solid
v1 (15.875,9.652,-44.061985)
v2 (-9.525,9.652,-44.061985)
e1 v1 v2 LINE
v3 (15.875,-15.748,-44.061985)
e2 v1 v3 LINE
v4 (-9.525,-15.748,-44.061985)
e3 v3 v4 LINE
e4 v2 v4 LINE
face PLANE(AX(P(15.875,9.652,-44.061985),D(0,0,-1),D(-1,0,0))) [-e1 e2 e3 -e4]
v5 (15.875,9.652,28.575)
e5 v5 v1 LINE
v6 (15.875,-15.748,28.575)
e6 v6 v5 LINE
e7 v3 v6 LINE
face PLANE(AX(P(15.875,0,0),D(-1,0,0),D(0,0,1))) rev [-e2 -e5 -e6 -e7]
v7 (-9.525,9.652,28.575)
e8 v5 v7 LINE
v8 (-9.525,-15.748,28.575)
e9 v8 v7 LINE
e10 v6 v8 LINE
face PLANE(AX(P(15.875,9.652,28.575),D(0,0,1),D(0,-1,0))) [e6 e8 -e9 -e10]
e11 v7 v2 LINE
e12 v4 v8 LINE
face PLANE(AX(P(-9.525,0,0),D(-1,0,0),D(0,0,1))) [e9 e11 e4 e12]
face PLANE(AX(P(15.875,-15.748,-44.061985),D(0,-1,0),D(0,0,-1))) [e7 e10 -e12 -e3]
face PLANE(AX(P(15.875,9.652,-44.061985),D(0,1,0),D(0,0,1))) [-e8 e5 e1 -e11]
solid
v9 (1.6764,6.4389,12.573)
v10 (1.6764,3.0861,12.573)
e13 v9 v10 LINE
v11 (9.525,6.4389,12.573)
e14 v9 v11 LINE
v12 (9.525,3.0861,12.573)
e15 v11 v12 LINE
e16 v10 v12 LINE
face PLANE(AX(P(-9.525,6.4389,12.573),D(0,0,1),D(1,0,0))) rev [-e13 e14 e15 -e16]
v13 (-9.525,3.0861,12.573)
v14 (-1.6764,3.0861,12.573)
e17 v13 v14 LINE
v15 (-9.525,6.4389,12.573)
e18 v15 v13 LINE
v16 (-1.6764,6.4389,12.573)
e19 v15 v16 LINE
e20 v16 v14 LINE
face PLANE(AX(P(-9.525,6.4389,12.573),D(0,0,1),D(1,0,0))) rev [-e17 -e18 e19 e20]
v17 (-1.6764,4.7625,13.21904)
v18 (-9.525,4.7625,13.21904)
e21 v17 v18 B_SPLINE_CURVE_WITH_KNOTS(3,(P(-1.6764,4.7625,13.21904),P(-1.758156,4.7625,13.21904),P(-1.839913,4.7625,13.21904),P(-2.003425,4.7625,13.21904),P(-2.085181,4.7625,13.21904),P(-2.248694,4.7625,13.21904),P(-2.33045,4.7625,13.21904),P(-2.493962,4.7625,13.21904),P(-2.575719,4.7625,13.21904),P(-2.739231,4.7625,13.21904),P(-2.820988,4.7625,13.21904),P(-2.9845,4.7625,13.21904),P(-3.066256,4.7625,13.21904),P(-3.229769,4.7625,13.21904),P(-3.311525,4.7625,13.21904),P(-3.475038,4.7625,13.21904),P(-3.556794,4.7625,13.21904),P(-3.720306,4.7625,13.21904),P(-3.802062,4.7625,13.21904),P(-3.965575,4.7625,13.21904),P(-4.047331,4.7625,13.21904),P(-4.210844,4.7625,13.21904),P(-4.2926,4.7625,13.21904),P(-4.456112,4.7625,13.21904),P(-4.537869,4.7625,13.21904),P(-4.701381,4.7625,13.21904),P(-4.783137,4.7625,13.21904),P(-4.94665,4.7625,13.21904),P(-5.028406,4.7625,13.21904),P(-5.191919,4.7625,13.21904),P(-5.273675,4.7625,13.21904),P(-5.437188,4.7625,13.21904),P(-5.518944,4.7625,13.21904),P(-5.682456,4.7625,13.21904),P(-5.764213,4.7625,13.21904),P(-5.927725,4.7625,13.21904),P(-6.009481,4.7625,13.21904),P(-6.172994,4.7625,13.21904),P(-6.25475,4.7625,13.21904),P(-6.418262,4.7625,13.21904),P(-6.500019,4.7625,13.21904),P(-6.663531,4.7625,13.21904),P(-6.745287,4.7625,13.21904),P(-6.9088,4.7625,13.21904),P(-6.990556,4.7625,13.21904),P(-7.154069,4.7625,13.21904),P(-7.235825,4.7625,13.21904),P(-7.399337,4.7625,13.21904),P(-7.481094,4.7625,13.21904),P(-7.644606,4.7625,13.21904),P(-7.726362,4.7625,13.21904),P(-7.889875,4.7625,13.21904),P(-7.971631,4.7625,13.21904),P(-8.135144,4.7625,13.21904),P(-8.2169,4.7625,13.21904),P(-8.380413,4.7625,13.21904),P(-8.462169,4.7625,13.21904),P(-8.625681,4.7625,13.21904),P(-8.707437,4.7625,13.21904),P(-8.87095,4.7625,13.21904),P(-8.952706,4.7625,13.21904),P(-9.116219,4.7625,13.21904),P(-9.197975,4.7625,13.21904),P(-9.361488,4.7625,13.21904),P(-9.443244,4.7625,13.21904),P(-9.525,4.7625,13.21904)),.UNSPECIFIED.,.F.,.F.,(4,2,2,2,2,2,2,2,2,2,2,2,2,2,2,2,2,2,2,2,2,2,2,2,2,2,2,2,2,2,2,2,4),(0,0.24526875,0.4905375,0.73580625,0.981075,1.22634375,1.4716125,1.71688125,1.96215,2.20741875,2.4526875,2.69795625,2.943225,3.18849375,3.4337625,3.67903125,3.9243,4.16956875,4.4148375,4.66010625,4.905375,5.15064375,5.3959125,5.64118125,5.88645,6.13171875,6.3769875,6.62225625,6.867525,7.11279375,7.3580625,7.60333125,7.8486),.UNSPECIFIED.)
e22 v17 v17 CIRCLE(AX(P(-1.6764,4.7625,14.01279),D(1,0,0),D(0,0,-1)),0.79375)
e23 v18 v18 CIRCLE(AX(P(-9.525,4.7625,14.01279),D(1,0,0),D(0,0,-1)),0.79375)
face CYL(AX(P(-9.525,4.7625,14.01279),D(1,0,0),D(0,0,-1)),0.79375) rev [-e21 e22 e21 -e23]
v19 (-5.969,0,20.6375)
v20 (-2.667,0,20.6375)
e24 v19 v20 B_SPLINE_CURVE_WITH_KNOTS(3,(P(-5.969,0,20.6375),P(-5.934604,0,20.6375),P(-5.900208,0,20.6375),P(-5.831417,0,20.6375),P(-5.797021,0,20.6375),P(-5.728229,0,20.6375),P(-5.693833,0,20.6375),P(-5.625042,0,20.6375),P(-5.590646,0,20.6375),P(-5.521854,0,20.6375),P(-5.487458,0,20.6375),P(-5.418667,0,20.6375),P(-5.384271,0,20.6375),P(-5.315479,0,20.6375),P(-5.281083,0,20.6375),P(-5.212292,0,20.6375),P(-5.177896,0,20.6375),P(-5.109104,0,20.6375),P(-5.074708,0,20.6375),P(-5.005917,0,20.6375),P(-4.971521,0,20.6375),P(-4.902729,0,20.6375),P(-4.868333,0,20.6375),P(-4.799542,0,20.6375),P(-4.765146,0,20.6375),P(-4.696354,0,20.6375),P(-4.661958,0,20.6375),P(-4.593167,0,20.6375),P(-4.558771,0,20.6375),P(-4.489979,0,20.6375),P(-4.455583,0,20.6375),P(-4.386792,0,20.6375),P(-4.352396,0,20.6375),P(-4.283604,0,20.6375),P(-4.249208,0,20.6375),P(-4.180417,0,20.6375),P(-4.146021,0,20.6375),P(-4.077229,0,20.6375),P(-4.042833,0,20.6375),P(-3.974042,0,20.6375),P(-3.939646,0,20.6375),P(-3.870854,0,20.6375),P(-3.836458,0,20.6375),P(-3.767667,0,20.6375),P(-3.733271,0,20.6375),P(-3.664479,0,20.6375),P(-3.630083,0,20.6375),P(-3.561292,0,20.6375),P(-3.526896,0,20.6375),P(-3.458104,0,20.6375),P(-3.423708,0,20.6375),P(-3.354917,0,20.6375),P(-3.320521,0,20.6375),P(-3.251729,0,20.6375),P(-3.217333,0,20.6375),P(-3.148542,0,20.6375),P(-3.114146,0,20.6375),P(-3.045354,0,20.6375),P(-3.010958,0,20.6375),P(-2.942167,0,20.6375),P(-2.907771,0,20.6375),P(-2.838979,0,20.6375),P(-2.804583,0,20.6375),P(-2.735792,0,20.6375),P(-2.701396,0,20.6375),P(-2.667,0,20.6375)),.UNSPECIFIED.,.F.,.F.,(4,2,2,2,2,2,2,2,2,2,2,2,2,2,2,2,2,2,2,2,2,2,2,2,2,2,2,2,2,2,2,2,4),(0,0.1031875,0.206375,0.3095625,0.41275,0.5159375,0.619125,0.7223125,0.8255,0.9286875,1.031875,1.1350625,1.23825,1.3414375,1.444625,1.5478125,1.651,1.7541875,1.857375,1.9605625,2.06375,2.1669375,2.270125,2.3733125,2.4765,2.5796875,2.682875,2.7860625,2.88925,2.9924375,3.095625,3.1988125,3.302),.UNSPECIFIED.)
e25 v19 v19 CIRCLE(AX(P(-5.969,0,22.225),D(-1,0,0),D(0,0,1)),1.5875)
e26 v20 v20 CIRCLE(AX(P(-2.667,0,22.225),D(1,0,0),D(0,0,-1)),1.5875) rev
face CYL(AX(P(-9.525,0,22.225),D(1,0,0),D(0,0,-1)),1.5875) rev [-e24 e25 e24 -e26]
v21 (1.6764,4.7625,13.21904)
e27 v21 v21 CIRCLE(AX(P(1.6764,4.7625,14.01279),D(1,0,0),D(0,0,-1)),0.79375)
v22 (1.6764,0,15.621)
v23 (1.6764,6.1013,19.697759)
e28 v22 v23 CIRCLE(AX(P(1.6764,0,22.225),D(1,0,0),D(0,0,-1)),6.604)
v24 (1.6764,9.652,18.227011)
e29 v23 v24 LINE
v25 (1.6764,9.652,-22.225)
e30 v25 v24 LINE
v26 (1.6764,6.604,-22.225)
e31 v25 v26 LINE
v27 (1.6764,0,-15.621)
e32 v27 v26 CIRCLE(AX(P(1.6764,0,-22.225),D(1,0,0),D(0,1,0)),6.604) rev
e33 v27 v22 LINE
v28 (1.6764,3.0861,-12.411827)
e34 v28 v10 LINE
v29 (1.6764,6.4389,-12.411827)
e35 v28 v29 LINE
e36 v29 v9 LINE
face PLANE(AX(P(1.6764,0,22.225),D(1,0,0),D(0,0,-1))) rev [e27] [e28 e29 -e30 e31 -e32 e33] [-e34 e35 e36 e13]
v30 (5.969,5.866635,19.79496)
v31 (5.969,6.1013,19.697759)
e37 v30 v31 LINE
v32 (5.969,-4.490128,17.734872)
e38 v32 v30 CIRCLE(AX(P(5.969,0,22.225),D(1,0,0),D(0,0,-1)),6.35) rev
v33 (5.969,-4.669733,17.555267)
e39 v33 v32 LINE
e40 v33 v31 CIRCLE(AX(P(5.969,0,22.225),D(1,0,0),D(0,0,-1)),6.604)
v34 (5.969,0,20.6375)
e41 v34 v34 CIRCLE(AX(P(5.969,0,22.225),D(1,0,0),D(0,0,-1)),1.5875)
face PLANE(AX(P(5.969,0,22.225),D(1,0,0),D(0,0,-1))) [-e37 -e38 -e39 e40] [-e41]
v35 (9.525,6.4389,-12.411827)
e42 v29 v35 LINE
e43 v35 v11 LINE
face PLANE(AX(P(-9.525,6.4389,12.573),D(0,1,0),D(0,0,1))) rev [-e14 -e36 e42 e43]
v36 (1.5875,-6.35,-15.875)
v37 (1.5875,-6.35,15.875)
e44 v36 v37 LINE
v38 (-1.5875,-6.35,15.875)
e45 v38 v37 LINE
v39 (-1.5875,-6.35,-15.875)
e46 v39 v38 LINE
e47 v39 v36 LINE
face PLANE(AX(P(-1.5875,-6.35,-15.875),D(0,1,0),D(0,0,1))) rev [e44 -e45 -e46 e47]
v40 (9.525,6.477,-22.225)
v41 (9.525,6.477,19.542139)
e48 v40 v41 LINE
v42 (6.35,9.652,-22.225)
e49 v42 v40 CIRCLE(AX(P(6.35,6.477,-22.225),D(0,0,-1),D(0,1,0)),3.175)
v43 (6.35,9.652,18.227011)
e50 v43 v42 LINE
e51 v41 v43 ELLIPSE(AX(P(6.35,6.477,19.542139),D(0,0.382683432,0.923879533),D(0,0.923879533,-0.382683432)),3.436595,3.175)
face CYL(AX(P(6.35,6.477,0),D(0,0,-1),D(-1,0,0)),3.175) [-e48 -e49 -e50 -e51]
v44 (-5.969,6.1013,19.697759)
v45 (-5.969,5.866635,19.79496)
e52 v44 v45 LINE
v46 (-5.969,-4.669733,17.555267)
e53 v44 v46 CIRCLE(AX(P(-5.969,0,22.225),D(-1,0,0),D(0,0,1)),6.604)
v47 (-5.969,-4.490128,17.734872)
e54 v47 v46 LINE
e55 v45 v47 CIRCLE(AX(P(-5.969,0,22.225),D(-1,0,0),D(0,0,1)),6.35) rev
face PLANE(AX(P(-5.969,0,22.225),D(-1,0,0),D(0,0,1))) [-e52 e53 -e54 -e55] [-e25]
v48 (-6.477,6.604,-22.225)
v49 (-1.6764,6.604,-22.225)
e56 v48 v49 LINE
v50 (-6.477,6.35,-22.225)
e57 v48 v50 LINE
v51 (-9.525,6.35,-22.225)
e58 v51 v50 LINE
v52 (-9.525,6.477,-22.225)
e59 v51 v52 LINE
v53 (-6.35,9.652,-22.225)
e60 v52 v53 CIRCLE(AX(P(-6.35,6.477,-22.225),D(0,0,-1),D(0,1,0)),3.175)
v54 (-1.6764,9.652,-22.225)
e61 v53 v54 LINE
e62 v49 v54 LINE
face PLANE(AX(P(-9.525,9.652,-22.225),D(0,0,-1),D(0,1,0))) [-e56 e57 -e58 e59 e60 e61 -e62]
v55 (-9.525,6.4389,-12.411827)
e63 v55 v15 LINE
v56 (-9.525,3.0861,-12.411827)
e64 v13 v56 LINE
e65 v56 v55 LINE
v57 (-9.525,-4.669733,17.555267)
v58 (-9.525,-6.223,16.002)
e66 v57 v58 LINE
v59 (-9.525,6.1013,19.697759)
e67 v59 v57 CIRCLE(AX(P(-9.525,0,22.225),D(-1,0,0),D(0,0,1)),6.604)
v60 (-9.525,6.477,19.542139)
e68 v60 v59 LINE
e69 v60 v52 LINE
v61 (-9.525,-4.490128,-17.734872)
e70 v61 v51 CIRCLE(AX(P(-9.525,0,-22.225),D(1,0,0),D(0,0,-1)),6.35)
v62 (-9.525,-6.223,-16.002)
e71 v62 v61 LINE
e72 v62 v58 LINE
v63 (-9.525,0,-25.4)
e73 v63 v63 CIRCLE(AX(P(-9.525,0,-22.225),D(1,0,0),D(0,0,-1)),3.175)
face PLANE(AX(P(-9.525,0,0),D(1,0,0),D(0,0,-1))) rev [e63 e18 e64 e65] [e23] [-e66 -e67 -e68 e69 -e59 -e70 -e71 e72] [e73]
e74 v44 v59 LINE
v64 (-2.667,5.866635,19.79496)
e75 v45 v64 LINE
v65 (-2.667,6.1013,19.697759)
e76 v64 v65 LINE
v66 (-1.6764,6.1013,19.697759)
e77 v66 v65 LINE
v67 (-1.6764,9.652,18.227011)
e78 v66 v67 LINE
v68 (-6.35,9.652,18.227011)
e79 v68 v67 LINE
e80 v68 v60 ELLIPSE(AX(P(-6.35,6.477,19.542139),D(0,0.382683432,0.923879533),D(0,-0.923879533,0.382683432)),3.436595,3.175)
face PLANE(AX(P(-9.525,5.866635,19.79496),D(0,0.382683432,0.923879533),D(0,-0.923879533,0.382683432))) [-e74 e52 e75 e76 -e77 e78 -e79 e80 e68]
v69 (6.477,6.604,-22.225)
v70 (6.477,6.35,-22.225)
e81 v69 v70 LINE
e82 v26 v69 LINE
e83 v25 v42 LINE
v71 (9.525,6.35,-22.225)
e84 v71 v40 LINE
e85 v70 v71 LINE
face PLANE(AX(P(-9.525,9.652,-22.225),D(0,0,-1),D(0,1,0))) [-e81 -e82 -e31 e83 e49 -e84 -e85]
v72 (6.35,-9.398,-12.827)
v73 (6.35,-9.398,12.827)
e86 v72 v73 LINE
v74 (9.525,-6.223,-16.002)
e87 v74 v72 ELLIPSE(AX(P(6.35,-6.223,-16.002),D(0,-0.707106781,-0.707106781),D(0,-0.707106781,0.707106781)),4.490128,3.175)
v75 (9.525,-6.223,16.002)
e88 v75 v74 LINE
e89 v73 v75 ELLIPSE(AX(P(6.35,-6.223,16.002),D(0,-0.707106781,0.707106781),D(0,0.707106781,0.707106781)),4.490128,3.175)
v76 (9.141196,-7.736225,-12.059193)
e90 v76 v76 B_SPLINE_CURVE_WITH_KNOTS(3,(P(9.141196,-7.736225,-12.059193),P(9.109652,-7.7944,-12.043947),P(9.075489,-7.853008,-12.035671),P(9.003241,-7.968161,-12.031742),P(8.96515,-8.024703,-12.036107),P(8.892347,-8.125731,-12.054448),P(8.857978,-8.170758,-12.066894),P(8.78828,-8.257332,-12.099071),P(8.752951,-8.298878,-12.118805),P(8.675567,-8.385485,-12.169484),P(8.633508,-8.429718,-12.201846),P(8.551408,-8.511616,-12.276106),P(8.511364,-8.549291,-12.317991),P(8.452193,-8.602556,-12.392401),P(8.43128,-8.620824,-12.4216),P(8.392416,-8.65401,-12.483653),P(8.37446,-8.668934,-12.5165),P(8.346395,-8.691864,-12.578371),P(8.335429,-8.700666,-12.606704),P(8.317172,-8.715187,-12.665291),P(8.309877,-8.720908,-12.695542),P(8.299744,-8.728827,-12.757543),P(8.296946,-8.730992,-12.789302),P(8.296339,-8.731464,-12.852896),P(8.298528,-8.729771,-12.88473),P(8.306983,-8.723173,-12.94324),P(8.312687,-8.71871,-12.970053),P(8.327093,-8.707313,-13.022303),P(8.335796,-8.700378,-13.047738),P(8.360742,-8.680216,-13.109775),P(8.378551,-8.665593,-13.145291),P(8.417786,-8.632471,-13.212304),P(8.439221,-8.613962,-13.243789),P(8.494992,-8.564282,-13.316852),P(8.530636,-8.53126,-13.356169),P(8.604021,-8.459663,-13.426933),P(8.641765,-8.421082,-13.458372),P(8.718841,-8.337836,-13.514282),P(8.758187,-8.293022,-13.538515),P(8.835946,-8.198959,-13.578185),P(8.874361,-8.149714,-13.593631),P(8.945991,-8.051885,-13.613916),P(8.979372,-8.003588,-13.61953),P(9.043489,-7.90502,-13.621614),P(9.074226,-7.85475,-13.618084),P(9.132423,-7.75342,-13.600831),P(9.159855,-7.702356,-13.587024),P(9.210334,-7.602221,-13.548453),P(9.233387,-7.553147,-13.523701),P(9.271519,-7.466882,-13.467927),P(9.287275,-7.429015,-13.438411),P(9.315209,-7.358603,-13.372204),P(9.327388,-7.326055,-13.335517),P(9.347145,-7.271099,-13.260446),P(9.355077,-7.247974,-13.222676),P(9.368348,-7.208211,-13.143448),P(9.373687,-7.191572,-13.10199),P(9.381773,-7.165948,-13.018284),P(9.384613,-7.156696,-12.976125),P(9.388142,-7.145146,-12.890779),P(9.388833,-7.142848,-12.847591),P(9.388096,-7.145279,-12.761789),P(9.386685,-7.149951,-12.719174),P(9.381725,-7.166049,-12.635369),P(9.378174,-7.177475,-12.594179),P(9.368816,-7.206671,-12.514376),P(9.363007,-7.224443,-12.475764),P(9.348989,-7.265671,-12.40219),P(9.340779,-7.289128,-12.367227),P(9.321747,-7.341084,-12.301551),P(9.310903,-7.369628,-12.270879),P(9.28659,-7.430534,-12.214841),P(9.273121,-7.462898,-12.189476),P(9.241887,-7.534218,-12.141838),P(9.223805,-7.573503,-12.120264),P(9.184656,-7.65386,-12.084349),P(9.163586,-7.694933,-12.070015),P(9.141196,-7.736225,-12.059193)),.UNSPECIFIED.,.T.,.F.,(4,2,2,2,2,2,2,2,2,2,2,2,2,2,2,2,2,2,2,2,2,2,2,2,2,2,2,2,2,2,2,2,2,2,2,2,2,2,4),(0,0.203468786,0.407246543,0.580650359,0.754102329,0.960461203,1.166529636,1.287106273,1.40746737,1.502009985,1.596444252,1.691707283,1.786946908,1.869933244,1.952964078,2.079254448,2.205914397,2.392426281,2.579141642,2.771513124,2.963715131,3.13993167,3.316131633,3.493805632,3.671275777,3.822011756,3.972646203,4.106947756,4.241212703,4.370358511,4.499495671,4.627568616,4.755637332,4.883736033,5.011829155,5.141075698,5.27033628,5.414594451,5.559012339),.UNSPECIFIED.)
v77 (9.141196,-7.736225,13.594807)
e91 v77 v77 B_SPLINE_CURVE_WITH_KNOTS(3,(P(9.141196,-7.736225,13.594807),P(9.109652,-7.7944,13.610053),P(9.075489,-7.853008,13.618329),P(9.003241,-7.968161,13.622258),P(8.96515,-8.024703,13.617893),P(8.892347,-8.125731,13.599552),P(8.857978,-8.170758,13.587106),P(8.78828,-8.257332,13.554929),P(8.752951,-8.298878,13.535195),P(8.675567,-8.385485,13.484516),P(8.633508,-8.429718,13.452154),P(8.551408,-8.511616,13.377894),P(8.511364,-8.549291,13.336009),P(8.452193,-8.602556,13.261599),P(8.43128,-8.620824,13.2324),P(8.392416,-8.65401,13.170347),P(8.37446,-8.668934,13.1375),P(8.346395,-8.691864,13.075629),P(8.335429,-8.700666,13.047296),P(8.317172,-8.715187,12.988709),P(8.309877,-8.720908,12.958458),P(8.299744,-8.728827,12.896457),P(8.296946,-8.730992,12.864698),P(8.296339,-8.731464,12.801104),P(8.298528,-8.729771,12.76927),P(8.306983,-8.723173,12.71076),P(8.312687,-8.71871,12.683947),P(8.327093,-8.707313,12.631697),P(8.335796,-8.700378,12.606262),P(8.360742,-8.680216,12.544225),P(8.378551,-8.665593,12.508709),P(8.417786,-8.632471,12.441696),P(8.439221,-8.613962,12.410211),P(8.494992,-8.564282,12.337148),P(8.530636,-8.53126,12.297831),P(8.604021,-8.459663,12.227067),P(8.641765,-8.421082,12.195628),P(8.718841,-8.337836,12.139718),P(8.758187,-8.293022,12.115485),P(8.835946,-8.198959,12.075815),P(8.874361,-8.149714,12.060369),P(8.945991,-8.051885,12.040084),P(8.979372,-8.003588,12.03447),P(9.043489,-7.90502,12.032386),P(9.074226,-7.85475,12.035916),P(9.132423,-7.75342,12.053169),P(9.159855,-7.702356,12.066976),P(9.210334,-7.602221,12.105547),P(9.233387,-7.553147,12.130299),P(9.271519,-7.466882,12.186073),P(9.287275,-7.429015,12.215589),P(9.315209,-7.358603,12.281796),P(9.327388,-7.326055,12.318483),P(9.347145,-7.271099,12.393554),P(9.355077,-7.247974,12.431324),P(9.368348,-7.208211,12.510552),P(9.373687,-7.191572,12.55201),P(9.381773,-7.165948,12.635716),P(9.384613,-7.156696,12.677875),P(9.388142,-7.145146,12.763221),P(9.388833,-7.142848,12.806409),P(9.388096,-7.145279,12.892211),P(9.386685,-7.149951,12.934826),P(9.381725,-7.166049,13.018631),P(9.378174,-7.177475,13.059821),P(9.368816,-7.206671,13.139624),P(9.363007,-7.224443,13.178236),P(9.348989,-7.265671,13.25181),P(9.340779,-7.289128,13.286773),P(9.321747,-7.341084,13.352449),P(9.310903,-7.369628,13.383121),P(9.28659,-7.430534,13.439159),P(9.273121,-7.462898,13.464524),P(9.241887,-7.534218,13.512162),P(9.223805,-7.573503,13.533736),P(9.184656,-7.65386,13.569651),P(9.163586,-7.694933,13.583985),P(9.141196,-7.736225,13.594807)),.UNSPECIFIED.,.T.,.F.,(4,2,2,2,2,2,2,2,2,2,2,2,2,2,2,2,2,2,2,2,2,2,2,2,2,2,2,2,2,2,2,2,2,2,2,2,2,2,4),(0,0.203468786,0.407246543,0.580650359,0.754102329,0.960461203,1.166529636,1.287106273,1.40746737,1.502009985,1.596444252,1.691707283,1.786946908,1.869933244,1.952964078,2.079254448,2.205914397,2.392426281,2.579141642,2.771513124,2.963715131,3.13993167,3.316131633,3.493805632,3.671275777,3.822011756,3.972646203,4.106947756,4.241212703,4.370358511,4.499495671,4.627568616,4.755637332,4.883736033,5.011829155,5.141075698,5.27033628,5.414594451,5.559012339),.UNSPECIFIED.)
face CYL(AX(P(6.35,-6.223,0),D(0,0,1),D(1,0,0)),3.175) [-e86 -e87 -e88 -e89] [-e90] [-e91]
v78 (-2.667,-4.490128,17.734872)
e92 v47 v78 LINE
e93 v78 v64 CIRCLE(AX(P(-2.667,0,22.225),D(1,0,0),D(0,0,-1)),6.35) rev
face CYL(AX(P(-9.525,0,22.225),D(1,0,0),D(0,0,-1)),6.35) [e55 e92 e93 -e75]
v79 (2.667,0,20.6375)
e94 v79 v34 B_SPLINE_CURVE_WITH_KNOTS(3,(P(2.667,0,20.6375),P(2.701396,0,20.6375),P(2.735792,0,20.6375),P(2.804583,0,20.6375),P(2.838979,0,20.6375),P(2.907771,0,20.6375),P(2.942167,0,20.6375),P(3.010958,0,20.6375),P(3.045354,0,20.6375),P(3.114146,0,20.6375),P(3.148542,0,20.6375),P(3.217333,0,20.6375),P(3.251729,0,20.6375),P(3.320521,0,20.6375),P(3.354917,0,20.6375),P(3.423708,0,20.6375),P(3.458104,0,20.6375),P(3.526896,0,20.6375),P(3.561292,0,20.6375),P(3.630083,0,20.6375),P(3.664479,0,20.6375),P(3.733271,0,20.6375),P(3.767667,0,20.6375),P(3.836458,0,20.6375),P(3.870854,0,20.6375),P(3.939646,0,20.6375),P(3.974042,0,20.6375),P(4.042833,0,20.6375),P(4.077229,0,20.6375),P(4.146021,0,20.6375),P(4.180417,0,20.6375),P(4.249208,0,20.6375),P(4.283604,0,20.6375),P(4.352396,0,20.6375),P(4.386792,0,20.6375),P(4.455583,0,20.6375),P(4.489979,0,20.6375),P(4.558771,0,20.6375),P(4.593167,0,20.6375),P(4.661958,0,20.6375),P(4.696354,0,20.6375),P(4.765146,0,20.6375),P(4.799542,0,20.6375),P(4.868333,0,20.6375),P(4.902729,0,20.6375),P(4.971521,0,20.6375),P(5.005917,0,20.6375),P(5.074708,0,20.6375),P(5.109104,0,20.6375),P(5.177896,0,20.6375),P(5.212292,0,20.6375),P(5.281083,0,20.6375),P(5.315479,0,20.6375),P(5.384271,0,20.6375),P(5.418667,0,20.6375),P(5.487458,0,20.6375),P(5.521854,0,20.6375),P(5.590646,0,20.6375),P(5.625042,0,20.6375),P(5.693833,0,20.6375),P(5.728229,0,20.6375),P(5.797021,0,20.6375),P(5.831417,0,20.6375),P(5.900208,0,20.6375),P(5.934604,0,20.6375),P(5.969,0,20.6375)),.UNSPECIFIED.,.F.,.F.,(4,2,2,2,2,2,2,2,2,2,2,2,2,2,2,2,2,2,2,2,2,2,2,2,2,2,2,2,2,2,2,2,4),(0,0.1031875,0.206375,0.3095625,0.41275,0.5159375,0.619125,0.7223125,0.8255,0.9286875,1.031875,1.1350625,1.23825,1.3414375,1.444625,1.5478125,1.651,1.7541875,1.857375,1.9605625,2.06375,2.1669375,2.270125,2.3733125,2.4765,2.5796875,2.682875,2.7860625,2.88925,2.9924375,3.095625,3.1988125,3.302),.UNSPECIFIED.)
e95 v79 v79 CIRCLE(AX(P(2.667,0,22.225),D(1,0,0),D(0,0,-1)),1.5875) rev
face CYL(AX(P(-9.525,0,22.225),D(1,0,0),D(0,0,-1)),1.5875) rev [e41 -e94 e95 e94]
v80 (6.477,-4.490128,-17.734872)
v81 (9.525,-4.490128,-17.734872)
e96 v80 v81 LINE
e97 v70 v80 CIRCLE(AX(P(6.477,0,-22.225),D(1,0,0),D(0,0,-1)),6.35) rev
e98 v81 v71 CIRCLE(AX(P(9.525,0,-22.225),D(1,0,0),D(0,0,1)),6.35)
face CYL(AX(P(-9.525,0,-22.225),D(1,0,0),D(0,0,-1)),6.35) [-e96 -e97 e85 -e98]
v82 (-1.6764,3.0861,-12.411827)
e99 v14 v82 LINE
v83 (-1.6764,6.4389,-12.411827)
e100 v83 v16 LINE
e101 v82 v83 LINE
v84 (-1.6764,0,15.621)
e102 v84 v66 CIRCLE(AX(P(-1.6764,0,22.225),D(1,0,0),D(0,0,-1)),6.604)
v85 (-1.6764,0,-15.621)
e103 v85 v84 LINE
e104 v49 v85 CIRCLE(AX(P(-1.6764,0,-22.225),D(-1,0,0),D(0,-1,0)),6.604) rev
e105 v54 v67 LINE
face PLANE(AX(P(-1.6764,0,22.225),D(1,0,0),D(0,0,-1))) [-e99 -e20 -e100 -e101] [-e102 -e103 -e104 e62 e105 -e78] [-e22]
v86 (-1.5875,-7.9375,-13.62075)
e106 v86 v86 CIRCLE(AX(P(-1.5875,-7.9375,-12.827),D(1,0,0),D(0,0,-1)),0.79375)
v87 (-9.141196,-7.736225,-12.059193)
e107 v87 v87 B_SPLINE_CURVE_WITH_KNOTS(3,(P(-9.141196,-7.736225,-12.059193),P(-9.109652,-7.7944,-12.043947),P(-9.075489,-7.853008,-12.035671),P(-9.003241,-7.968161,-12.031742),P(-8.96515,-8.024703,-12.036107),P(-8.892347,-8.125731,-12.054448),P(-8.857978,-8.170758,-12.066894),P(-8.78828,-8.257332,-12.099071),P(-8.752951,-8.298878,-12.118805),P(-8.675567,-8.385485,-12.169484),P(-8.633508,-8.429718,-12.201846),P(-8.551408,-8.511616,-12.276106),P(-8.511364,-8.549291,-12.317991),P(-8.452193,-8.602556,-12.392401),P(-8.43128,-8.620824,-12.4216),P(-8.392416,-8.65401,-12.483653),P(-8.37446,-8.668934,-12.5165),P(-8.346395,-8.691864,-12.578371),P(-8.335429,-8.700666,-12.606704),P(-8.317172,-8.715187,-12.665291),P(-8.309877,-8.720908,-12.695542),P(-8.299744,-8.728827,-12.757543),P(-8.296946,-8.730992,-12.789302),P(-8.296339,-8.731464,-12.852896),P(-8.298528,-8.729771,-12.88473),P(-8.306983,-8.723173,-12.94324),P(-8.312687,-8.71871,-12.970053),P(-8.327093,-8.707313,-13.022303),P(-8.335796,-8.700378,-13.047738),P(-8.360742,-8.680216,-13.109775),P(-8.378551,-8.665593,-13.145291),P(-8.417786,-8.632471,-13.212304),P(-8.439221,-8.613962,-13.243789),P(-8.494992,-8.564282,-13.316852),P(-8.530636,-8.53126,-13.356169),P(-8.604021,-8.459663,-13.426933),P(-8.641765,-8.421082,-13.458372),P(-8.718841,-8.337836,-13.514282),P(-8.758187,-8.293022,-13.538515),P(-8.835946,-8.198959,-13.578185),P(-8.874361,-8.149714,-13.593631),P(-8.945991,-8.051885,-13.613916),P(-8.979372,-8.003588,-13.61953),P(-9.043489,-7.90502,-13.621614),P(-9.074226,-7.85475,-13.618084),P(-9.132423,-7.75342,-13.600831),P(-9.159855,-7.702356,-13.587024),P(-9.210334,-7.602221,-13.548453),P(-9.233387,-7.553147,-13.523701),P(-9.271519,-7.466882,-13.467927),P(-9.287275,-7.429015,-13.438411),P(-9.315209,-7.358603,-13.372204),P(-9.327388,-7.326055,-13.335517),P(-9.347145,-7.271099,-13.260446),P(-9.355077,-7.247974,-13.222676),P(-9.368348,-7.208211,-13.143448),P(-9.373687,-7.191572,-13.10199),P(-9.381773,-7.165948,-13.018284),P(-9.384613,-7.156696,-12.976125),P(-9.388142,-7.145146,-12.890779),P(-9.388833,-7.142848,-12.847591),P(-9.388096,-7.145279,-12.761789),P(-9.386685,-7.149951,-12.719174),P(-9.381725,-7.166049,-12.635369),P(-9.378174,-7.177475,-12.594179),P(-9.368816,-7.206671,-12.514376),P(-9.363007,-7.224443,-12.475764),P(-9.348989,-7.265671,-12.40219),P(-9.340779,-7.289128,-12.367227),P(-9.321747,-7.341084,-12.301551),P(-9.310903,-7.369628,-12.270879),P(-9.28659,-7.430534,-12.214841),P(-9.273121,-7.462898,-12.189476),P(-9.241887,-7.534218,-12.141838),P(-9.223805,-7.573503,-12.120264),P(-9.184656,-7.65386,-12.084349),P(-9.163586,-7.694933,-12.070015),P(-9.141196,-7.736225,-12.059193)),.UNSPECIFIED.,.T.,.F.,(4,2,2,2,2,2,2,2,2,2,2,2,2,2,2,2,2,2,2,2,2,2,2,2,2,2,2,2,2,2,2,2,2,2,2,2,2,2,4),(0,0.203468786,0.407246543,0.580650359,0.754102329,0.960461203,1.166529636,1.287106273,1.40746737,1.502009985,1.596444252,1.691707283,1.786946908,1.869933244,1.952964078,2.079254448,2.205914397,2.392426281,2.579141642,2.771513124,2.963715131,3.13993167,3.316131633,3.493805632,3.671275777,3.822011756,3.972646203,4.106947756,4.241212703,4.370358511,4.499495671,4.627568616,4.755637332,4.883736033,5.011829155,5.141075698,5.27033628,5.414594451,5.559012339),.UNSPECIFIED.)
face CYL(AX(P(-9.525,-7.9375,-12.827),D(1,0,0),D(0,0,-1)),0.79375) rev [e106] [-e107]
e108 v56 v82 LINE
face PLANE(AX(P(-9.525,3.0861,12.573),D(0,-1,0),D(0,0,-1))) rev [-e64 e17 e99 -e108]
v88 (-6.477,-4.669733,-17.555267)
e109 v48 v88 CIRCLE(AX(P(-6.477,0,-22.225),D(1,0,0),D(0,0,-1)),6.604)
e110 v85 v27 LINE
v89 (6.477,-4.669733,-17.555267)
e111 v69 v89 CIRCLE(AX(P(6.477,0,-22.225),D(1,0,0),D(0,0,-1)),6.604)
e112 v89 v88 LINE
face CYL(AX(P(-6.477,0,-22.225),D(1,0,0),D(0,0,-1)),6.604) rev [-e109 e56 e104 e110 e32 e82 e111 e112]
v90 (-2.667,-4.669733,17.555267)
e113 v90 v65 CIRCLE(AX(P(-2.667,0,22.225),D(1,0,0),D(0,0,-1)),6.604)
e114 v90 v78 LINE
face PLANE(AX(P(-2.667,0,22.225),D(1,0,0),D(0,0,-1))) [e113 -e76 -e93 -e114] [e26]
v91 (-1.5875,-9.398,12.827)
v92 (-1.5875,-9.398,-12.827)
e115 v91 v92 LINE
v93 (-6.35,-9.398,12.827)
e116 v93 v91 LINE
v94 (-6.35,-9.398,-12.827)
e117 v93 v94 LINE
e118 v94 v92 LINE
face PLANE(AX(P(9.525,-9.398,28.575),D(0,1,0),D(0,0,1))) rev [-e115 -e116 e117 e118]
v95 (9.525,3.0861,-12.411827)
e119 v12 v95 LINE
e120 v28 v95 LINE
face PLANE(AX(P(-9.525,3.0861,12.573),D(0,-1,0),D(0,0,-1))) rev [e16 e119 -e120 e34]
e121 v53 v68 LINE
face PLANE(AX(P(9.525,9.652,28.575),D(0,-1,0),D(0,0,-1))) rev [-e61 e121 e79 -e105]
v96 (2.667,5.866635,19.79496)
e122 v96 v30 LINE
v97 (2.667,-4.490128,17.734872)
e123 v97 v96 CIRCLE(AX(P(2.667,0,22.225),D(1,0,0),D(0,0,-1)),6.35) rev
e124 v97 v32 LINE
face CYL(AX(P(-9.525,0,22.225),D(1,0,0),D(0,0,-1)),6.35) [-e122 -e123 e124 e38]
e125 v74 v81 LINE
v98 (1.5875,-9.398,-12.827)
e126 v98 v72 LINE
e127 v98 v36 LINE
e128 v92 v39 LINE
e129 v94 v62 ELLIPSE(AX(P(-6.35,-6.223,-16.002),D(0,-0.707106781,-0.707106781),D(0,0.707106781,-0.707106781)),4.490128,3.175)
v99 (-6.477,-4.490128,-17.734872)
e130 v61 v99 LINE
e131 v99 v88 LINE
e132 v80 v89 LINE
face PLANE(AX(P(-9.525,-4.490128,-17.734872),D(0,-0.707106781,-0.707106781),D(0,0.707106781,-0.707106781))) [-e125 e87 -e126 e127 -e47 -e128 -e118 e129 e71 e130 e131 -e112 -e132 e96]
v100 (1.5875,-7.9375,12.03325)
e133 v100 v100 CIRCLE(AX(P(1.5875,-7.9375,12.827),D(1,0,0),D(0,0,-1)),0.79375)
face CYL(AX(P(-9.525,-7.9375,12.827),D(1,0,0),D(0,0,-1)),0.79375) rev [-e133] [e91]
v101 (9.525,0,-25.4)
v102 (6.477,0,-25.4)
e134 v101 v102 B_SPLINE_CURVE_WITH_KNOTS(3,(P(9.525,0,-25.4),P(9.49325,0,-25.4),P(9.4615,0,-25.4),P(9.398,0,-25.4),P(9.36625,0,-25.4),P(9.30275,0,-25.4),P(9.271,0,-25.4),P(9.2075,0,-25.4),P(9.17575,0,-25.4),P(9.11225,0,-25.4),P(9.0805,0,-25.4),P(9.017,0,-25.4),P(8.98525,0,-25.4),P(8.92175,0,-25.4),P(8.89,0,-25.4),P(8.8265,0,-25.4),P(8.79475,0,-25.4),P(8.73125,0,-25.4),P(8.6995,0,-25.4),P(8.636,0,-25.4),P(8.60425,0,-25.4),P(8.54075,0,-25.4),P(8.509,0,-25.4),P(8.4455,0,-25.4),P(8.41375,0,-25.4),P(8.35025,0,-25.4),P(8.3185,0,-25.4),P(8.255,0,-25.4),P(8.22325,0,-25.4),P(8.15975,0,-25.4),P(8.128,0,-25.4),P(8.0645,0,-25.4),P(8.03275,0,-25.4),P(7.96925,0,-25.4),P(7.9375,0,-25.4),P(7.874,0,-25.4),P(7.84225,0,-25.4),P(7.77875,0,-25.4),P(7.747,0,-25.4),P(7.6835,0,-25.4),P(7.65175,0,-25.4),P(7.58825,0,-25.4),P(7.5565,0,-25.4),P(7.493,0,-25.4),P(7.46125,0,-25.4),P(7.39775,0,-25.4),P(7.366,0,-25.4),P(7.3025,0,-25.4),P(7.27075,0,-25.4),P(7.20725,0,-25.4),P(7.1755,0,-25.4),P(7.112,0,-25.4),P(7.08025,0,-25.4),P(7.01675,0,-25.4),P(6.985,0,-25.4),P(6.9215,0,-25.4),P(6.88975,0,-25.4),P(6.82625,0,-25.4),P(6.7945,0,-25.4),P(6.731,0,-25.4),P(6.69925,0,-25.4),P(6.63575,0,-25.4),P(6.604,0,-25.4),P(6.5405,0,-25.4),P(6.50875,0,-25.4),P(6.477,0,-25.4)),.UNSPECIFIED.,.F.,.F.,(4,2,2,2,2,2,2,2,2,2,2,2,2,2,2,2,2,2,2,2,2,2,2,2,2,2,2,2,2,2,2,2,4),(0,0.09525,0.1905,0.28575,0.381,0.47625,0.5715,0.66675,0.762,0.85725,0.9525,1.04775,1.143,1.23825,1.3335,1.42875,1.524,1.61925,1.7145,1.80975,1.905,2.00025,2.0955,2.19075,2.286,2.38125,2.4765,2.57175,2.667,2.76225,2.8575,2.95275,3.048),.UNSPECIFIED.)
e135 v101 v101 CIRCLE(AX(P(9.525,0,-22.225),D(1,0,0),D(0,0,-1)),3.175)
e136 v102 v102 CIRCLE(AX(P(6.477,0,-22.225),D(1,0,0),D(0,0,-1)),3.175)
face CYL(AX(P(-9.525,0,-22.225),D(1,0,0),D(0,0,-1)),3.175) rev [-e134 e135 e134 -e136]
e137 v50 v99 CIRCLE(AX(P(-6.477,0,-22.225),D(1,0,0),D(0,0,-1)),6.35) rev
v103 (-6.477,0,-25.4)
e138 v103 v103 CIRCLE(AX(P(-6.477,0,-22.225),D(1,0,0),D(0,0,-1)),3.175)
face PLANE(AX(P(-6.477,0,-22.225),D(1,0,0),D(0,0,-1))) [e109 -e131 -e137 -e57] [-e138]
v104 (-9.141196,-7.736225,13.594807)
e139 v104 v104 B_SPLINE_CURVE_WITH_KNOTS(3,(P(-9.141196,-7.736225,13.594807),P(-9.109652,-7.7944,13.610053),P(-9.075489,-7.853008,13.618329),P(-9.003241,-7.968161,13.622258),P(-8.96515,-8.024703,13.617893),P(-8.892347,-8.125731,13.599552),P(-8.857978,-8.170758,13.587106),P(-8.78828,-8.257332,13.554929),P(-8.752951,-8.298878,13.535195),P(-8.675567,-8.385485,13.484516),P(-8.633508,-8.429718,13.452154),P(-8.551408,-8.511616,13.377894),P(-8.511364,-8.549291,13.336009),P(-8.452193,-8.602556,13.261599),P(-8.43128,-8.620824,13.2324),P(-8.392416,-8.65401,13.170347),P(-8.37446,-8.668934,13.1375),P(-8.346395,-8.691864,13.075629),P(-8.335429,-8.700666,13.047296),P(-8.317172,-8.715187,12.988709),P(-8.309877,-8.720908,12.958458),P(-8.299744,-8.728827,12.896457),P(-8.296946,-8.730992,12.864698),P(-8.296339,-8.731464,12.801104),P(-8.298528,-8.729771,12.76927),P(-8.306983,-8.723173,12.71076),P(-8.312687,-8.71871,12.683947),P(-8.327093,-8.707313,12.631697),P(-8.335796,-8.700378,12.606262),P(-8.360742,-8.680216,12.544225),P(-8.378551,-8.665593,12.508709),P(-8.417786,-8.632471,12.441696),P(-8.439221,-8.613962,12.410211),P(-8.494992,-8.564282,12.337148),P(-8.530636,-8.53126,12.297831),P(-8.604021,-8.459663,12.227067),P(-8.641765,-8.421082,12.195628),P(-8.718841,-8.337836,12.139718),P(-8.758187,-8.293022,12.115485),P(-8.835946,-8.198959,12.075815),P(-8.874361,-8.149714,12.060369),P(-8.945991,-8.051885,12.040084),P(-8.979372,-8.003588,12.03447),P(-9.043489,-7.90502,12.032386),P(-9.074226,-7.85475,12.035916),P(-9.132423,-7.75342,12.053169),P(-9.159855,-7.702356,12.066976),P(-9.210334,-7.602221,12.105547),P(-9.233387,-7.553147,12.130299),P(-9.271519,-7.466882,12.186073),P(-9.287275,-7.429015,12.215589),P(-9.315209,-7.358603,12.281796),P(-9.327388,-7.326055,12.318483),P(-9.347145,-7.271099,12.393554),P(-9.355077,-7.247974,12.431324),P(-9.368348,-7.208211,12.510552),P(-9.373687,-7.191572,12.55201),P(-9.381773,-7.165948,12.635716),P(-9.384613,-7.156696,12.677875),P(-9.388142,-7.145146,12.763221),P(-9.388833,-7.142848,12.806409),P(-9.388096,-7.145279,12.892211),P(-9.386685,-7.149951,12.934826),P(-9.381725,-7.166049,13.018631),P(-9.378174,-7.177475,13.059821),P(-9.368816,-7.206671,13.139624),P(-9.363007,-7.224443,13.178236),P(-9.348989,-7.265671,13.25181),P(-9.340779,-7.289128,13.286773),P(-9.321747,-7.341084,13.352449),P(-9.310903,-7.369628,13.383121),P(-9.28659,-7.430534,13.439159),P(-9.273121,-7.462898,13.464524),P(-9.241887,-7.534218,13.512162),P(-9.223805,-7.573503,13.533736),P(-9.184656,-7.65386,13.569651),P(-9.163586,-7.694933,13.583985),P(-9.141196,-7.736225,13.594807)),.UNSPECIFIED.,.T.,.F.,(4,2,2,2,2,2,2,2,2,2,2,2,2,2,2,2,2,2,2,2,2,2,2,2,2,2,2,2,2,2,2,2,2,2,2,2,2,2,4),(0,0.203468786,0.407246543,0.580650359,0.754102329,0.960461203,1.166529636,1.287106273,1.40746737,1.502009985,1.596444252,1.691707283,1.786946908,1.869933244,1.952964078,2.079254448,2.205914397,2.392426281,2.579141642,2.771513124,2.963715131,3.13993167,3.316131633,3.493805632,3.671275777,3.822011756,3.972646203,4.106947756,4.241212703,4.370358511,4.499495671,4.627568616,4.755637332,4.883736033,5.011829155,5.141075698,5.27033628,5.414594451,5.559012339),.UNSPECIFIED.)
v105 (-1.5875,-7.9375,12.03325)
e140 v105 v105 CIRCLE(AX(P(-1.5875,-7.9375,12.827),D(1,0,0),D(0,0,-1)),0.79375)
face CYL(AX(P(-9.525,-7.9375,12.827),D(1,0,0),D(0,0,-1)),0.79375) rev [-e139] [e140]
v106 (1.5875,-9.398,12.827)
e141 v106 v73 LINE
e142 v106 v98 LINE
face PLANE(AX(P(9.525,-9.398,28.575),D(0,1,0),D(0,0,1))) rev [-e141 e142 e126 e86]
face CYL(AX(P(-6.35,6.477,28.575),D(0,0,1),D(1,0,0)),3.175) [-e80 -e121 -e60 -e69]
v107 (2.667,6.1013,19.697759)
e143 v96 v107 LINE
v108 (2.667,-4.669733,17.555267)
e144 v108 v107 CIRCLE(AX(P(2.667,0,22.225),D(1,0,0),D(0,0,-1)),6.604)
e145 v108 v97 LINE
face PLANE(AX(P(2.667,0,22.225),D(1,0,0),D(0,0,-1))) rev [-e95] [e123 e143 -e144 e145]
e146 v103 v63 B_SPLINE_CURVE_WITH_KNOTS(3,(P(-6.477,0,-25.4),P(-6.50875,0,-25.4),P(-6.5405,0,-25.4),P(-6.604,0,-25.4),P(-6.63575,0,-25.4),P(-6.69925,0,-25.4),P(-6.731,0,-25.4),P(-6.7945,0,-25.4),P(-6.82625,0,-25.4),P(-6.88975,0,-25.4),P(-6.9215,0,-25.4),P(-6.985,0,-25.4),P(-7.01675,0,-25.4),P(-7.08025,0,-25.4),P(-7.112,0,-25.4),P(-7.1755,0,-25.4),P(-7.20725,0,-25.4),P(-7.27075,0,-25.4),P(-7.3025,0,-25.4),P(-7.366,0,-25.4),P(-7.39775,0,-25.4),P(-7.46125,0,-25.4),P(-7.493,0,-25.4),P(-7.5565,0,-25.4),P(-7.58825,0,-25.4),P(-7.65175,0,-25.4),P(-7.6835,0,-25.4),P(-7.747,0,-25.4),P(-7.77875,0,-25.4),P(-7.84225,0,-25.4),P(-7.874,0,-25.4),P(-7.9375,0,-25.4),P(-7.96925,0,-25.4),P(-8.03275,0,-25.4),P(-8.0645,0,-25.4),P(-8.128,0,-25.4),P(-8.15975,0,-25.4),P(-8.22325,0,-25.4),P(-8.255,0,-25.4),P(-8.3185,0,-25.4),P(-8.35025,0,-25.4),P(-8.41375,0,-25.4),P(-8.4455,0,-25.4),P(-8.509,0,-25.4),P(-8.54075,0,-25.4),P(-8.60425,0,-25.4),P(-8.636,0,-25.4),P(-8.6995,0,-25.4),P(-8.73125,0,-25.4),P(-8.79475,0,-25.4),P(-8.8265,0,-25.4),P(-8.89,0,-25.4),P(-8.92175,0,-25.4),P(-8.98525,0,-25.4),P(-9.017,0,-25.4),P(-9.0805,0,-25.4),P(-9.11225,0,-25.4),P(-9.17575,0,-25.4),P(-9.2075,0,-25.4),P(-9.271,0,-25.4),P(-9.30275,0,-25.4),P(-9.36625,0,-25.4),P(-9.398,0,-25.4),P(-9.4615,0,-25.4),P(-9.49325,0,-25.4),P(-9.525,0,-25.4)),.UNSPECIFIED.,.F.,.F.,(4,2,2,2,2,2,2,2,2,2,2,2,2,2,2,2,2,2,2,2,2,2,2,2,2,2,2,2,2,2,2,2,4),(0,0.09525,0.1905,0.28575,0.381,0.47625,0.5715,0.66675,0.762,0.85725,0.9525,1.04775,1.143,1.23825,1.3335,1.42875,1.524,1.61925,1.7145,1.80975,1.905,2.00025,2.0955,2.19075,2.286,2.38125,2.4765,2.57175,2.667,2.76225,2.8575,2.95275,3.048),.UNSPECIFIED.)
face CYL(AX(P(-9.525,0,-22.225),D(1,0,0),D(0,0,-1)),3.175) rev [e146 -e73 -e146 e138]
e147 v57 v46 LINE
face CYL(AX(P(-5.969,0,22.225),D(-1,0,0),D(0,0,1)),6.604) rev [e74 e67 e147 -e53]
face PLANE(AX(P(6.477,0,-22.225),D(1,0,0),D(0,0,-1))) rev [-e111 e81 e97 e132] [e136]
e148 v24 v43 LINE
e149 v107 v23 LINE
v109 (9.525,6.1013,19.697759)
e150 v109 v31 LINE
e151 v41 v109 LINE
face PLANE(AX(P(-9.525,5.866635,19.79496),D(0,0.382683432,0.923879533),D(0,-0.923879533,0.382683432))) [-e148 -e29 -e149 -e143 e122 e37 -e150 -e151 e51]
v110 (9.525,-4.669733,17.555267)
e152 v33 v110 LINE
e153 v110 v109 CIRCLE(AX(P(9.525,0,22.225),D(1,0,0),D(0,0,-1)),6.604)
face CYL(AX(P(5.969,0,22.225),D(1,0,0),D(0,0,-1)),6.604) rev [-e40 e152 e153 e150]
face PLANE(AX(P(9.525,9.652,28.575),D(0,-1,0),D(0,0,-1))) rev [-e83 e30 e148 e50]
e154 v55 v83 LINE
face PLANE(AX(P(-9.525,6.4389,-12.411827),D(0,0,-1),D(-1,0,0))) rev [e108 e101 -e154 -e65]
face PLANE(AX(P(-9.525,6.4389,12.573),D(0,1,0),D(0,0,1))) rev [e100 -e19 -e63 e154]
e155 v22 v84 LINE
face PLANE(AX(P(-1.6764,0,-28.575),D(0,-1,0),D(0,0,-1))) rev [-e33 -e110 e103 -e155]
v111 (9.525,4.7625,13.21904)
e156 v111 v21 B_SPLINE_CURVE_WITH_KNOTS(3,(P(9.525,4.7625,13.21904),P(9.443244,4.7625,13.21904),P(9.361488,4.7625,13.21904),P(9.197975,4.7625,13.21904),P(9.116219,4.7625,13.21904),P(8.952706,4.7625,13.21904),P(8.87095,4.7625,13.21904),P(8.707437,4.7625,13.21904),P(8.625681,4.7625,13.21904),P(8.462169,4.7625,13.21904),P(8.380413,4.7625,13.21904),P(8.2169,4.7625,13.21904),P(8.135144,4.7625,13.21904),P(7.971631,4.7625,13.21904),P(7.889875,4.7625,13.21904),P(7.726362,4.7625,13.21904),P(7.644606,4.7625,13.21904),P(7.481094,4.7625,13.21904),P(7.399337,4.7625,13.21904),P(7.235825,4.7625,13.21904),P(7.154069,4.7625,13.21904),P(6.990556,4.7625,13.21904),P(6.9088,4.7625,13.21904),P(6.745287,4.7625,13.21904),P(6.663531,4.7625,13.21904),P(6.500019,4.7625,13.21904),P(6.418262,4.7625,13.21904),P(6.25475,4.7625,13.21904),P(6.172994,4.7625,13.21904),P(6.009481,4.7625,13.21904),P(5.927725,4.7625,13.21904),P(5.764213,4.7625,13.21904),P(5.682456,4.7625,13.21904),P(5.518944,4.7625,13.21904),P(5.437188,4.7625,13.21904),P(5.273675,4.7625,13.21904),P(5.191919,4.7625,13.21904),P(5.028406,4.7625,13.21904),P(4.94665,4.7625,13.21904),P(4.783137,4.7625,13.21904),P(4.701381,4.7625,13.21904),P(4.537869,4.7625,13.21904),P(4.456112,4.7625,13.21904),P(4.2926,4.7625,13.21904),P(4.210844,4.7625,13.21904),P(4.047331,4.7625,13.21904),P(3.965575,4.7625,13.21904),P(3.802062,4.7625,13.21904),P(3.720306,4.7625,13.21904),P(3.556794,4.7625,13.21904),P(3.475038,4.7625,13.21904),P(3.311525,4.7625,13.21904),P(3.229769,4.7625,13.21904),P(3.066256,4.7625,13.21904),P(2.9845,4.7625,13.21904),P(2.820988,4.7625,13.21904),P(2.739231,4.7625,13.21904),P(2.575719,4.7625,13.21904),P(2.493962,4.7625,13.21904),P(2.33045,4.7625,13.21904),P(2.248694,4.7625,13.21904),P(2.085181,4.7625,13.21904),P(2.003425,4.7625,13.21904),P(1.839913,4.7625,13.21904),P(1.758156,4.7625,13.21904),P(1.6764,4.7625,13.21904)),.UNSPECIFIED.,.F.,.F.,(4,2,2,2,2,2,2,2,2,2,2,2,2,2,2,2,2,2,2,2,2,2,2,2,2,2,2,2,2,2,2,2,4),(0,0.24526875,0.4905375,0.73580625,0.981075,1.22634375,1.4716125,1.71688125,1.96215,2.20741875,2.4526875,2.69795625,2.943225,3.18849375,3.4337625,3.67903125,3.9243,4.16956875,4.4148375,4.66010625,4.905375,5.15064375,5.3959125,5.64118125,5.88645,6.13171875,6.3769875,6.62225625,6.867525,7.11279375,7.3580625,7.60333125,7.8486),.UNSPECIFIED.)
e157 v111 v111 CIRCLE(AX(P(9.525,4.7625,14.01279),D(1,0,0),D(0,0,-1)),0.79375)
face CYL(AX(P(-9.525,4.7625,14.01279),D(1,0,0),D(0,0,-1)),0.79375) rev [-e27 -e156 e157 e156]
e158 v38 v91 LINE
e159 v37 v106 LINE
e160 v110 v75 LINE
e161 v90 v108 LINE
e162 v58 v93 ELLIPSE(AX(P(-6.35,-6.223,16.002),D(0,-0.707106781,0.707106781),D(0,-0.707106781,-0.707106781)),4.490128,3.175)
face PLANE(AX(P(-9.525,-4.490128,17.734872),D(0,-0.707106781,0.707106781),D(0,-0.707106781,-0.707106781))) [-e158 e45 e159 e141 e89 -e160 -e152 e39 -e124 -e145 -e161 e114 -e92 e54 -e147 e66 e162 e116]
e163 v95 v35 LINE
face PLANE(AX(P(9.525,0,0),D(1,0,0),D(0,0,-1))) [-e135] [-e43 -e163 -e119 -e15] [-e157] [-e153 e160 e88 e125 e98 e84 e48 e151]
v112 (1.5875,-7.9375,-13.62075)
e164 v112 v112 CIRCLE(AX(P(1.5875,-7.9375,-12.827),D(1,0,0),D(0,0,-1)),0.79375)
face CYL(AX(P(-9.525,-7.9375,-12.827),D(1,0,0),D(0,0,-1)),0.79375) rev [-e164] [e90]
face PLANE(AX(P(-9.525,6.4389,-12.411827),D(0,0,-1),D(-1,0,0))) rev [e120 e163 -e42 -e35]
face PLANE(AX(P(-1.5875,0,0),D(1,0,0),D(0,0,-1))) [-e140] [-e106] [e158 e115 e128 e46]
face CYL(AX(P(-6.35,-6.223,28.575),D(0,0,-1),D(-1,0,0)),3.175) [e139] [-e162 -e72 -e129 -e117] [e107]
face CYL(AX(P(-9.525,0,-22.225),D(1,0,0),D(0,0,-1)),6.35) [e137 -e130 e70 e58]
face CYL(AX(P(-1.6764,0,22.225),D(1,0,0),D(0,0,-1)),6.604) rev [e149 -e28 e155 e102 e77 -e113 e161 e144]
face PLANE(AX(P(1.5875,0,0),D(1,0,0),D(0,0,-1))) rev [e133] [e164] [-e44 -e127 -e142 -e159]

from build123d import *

# Parameters (mm, degrees)
SKETCH1_W                = 57.15
SKETCH1_H                = 19.05
BOSS_EXTRUDE1_DEPTH      = 9.525
CUT_EXTRUDE3_DEPTH       = 32.629374859
CUT_EXTRUDE3_DEPTH_BACK  = 32.629374859
SKETCH2_OUTSIDE_W        = 71.786
SKETCH2_OUTSIDE_H        = 33.686
SKETCH7_R                = 6.604
CUT_EXTRUDE6_DEPTH       = 6.477
SKETCH11_R               = 6.604
CUT_EXTRUDE10_DEPTH      = 1.6764
SKETCH8_R                = 6.604
CUT_EXTRUDE7_DEPTH       = 3.556
CUT_EXTRUDE8_START       = -3.556
SKETCH9_R                = 6.604
CUT_EXTRUDE8_DEPTH       = 3.556
CUT_EXTRUDE9_DEPTH       = 32.629374859
CUT_EXTRUDE9_DEPTH_BACK  = 32.629374859
SKETCH10_R               = 1.5875
SKETCH10_R_2             = 3.175
CUT_EXTRUDE11_DEPTH      = 32.629374859
CUT_EXTRUDE11_DEPTH_BACK = 32.629374859
SKETCH12_W               = 3.3528
SKETCH12_H               = 6.477
CUT_EXTRUDE12_DEPTH      = 32.629374859
CUT_EXTRUDE12_DEPTH_BACK = 32.629374859
SKETCH13_R               = 0.79375
SKETCH13_W               = 24.984827435
SKETCH13_H               = 3.3528
CUT_EXTRUDE13_DEPTH      = 1.5875
CUT_EXTRUDE14_DEPTH      = 32.629374859
CUT_EXTRUDE14_DEPTH_BACK = 32.629374859
SKETCH16_R               = 0.79375
FILLET1_R                = 3.175
CUT_EXTRUDE15_DEPTH      = 32.62937489
CUT_EXTRUDE15_DEPTH_BACK = 32.62937489
SKETCH18_W               = 3.3528
SKETCH18_H               = 3.175
SKETCH19_R               = 6.604
CUT_EXTRUDE16_DEPTH      = 2.667
SKETCH20_W               = 72.636985126
SKETCH20_H               = 25.4
BOSS_EXTRUDE2_DEPTH      = 25.4


with BuildPart() as part:
    # Sketch1 → Boss-Extrude1 (new, symmetric)
    with BuildSketch(Plane(origin=(0, 0, 0), x_dir=(0, 0, -1), z_dir=(1, 0, 0))):
        with Locations((0, 0.127)):
            Rectangle(SKETCH1_W, SKETCH1_H)
    extrude(amount=BOSS_EXTRUDE1_DEPTH, both=True)

    # Sketch2 outside → Cut-Extrude3 (cut, two sides: drawn at the far end of the back side and taken through both)
    with BuildSketch(Plane(origin=(0, 0, 0), x_dir=(0, 0, -1), z_dir=(1, 0, 0)).offset(-CUT_EXTRUDE3_DEPTH_BACK)):
        with Locations((0, 0.127)):
            Rectangle(SKETCH2_OUTSIDE_W, SKETCH2_OUTSIDE_H)
        with BuildLine():
            Line((-17.734871939, -4.490128061), (-12.827, -9.398))
            Line((-12.827, -9.398), (12.827, -9.398))
            Line((12.827, -9.398), (17.734871939, -4.490128061))
            ThreePointArc((17.734871939, -4.490128061), (28.091635031, -2.430039796), (22.225, 6.35))
            Line((22.225, 6.35), (22.225, 9.652))
            Line((22.225, 9.652), (-18.227010696, 9.652))
            Line((-18.227010696, 9.652), (-19.794960204, 5.866635031))
            ThreePointArc((-19.794960204, 5.866635031), (-28.452986531, -1.238823545), (-17.734871939, -4.490128061))
        make_face(mode=Mode.SUBTRACT)
    extrude(amount=CUT_EXTRUDE3_DEPTH + CUT_EXTRUDE3_DEPTH_BACK, mode=Mode.SUBTRACT)

    # Sketch7 → Cut-Extrude6 (cut, symmetric)
    with BuildSketch(Plane(origin=(0, 0, 0), x_dir=(0, 0, -1), z_dir=(1, 0, 0))):
        with Locations((22.225, 0)):
            Circle(SKETCH7_R)
    extrude(amount=CUT_EXTRUDE6_DEPTH, both=True, mode=Mode.SUBTRACT)

    # Sketch11 → Cut-Extrude10 (cut, symmetric)
    with BuildSketch(Plane(origin=(0, 0, 0), x_dir=(0, 0, -1), z_dir=(1, 0, 0))):
        with Locations((-22.225, 0)):
            Circle(SKETCH11_R)
    extrude(amount=CUT_EXTRUDE10_DEPTH, both=True, mode=Mode.SUBTRACT)

    # Sketch8 → Cut-Extrude7 (cut)
    with BuildSketch(Plane(origin=(9.525, 0, 0), x_dir=(0, 0, -1), z_dir=(1, 0, 0))):
        with Locations((-22.225, 0)):
            Circle(SKETCH8_R)
    extrude(amount=-CUT_EXTRUDE7_DEPTH, mode=Mode.SUBTRACT)

    # Sketch9 → Cut-Extrude8 (cut)
    with BuildSketch(Plane.ZY.offset(9.525).offset(CUT_EXTRUDE8_START)):
        with Locations((22.225, 0)):
            Circle(SKETCH9_R)
    extrude(amount=CUT_EXTRUDE8_DEPTH, mode=Mode.SUBTRACT)

    # Sketch10 → Cut-Extrude9 (cut, two sides: drawn at the far end of the back side and taken through both)
    with BuildSketch(Plane(origin=(0, 0, 0), x_dir=(0, 0, -1), z_dir=(1, 0, 0)).offset(-CUT_EXTRUDE9_DEPTH_BACK)):
        with Locations((-22.225, 0)):
            Circle(SKETCH10_R)
        with Locations((22.225, 0)):
            Circle(SKETCH10_R_2)
    extrude(amount=CUT_EXTRUDE9_DEPTH + CUT_EXTRUDE9_DEPTH_BACK, mode=Mode.SUBTRACT)

    # Sketch12 → Cut-Extrude11 (cut, two sides: drawn at the far end of the back side and taken through both)
    with BuildSketch(Plane.XY.offset(-CUT_EXTRUDE11_DEPTH_BACK)):
        with Locations((0, 6.4135)):
            Rectangle(SKETCH12_W, SKETCH12_H)
    extrude(amount=CUT_EXTRUDE11_DEPTH + CUT_EXTRUDE11_DEPTH_BACK, mode=Mode.SUBTRACT)

    # Sketch13 → Cut-Extrude12 (cut, two sides: drawn at the far end of the back side and taken through both)
    with BuildSketch(Plane(origin=(0, 0, 0), x_dir=(0, 0, -1), z_dir=(1, 0, 0)).offset(-CUT_EXTRUDE12_DEPTH_BACK)):
        with Locations((-14.01279023, 4.7625)):
            Circle(SKETCH13_R)
        with Locations((-0.080586282, 4.7625)):
            Rectangle(SKETCH13_W, SKETCH13_H)
    extrude(amount=CUT_EXTRUDE12_DEPTH + CUT_EXTRUDE12_DEPTH_BACK, mode=Mode.SUBTRACT)

    # Sketch14 → Cut-Extrude13 (cut, symmetric)
    with BuildSketch(Plane(origin=(0, 0, 0), x_dir=(0, 0, -1), z_dir=(1, 0, 0))):
        Polygon((-15.875, -6.35), (-12.827, -9.398), (12.827, -9.398), (15.875, -6.35), align=None)
    extrude(amount=CUT_EXTRUDE13_DEPTH, both=True, mode=Mode.SUBTRACT)

    # Sketch16 → Cut-Extrude14 (cut, two sides: drawn at the far end of the back side and taken through both)
    with BuildSketch(Plane(origin=(0, 0, 0), x_dir=(0, 0, -1), z_dir=(1, 0, 0)).offset(-CUT_EXTRUDE14_DEPTH_BACK)):
        with Locations((-12.827, -7.9375)):
            Circle(SKETCH16_R)
        with Locations((12.827, -7.9375)):
            Circle(SKETCH16_R)
    extrude(amount=CUT_EXTRUDE14_DEPTH + CUT_EXTRUDE14_DEPTH_BACK, mode=Mode.SUBTRACT)

    # Fillet1
    # the kernel refuses this fillet: 3.175 mm, written as the material it takes off along each edge
    with BuildSketch(Plane(origin=(-9.525, 9.652, 26.164510696), x_dir=(1, 0, 0), z_dir=(0, 0, -1)), Plane(origin=(9.525, 9.652, 26.164510696), x_dir=(0, -1, 0), z_dir=(0, 0, -1))) as fillet1_piece_1:
        with BuildLine():
            CenterArc((FILLET1_R, FILLET1_R), FILLET1_R, 180, 90)
            Line((0, FILLET1_R), (0, 0))
            Line((0, 0), (FILLET1_R, 0))
        make_face()
    extrude(amount=56.327010696, mode=Mode.SUBTRACT)
    with BuildSketch(Plane(origin=(-9.525, -9.398, -20.7645), x_dir=(0, 1, 0), z_dir=(0, 0, 1)), Plane(origin=(9.525, -9.398, -20.7645), x_dir=(-1, 0, 0), z_dir=(0, 0, 1))) as fillet1_piece_2:
        with BuildLine():
            CenterArc((FILLET1_R, -FILLET1_R), FILLET1_R, 90, 90)
            Line((0, -FILLET1_R), (0, 0))
            Line((0, 0), (FILLET1_R, 0))
        make_face()
    extrude(amount=41.529, mode=Mode.SUBTRACT)

    # Sketch18 → Cut-Extrude15 (cut, two sides: drawn at the far end of the back side and taken through both)
    with BuildSketch(Plane.XY.offset(-CUT_EXTRUDE15_DEPTH_BACK)):
        with Locations((0, 1.5875)):
            Rectangle(SKETCH18_W, SKETCH18_H)
    extrude(amount=CUT_EXTRUDE15_DEPTH + CUT_EXTRUDE15_DEPTH_BACK, mode=Mode.SUBTRACT)

    # Sketch19 → Cut-Extrude16 (cut, symmetric)
    with BuildSketch(Plane(origin=(0, 0, 0), x_dir=(0, 0, -1), z_dir=(1, 0, 0))):
        with Locations((-22.225, 0)):
            Circle(SKETCH19_R)
    extrude(amount=CUT_EXTRUDE16_DEPTH, both=True, mode=Mode.SUBTRACT)


with BuildPart() as body_2:
    # Sketch20 → Boss-Extrude2 (new body)
    with BuildSketch(Plane.ZY.offset(9.525)):
        with Locations((-7.743492563, -3.048)):
            Rectangle(SKETCH20_W, SKETCH20_H)
    extrude(amount=-BOSS_EXTRUDE2_DEPTH)


solid = Compound([part.part, body_2.part])
